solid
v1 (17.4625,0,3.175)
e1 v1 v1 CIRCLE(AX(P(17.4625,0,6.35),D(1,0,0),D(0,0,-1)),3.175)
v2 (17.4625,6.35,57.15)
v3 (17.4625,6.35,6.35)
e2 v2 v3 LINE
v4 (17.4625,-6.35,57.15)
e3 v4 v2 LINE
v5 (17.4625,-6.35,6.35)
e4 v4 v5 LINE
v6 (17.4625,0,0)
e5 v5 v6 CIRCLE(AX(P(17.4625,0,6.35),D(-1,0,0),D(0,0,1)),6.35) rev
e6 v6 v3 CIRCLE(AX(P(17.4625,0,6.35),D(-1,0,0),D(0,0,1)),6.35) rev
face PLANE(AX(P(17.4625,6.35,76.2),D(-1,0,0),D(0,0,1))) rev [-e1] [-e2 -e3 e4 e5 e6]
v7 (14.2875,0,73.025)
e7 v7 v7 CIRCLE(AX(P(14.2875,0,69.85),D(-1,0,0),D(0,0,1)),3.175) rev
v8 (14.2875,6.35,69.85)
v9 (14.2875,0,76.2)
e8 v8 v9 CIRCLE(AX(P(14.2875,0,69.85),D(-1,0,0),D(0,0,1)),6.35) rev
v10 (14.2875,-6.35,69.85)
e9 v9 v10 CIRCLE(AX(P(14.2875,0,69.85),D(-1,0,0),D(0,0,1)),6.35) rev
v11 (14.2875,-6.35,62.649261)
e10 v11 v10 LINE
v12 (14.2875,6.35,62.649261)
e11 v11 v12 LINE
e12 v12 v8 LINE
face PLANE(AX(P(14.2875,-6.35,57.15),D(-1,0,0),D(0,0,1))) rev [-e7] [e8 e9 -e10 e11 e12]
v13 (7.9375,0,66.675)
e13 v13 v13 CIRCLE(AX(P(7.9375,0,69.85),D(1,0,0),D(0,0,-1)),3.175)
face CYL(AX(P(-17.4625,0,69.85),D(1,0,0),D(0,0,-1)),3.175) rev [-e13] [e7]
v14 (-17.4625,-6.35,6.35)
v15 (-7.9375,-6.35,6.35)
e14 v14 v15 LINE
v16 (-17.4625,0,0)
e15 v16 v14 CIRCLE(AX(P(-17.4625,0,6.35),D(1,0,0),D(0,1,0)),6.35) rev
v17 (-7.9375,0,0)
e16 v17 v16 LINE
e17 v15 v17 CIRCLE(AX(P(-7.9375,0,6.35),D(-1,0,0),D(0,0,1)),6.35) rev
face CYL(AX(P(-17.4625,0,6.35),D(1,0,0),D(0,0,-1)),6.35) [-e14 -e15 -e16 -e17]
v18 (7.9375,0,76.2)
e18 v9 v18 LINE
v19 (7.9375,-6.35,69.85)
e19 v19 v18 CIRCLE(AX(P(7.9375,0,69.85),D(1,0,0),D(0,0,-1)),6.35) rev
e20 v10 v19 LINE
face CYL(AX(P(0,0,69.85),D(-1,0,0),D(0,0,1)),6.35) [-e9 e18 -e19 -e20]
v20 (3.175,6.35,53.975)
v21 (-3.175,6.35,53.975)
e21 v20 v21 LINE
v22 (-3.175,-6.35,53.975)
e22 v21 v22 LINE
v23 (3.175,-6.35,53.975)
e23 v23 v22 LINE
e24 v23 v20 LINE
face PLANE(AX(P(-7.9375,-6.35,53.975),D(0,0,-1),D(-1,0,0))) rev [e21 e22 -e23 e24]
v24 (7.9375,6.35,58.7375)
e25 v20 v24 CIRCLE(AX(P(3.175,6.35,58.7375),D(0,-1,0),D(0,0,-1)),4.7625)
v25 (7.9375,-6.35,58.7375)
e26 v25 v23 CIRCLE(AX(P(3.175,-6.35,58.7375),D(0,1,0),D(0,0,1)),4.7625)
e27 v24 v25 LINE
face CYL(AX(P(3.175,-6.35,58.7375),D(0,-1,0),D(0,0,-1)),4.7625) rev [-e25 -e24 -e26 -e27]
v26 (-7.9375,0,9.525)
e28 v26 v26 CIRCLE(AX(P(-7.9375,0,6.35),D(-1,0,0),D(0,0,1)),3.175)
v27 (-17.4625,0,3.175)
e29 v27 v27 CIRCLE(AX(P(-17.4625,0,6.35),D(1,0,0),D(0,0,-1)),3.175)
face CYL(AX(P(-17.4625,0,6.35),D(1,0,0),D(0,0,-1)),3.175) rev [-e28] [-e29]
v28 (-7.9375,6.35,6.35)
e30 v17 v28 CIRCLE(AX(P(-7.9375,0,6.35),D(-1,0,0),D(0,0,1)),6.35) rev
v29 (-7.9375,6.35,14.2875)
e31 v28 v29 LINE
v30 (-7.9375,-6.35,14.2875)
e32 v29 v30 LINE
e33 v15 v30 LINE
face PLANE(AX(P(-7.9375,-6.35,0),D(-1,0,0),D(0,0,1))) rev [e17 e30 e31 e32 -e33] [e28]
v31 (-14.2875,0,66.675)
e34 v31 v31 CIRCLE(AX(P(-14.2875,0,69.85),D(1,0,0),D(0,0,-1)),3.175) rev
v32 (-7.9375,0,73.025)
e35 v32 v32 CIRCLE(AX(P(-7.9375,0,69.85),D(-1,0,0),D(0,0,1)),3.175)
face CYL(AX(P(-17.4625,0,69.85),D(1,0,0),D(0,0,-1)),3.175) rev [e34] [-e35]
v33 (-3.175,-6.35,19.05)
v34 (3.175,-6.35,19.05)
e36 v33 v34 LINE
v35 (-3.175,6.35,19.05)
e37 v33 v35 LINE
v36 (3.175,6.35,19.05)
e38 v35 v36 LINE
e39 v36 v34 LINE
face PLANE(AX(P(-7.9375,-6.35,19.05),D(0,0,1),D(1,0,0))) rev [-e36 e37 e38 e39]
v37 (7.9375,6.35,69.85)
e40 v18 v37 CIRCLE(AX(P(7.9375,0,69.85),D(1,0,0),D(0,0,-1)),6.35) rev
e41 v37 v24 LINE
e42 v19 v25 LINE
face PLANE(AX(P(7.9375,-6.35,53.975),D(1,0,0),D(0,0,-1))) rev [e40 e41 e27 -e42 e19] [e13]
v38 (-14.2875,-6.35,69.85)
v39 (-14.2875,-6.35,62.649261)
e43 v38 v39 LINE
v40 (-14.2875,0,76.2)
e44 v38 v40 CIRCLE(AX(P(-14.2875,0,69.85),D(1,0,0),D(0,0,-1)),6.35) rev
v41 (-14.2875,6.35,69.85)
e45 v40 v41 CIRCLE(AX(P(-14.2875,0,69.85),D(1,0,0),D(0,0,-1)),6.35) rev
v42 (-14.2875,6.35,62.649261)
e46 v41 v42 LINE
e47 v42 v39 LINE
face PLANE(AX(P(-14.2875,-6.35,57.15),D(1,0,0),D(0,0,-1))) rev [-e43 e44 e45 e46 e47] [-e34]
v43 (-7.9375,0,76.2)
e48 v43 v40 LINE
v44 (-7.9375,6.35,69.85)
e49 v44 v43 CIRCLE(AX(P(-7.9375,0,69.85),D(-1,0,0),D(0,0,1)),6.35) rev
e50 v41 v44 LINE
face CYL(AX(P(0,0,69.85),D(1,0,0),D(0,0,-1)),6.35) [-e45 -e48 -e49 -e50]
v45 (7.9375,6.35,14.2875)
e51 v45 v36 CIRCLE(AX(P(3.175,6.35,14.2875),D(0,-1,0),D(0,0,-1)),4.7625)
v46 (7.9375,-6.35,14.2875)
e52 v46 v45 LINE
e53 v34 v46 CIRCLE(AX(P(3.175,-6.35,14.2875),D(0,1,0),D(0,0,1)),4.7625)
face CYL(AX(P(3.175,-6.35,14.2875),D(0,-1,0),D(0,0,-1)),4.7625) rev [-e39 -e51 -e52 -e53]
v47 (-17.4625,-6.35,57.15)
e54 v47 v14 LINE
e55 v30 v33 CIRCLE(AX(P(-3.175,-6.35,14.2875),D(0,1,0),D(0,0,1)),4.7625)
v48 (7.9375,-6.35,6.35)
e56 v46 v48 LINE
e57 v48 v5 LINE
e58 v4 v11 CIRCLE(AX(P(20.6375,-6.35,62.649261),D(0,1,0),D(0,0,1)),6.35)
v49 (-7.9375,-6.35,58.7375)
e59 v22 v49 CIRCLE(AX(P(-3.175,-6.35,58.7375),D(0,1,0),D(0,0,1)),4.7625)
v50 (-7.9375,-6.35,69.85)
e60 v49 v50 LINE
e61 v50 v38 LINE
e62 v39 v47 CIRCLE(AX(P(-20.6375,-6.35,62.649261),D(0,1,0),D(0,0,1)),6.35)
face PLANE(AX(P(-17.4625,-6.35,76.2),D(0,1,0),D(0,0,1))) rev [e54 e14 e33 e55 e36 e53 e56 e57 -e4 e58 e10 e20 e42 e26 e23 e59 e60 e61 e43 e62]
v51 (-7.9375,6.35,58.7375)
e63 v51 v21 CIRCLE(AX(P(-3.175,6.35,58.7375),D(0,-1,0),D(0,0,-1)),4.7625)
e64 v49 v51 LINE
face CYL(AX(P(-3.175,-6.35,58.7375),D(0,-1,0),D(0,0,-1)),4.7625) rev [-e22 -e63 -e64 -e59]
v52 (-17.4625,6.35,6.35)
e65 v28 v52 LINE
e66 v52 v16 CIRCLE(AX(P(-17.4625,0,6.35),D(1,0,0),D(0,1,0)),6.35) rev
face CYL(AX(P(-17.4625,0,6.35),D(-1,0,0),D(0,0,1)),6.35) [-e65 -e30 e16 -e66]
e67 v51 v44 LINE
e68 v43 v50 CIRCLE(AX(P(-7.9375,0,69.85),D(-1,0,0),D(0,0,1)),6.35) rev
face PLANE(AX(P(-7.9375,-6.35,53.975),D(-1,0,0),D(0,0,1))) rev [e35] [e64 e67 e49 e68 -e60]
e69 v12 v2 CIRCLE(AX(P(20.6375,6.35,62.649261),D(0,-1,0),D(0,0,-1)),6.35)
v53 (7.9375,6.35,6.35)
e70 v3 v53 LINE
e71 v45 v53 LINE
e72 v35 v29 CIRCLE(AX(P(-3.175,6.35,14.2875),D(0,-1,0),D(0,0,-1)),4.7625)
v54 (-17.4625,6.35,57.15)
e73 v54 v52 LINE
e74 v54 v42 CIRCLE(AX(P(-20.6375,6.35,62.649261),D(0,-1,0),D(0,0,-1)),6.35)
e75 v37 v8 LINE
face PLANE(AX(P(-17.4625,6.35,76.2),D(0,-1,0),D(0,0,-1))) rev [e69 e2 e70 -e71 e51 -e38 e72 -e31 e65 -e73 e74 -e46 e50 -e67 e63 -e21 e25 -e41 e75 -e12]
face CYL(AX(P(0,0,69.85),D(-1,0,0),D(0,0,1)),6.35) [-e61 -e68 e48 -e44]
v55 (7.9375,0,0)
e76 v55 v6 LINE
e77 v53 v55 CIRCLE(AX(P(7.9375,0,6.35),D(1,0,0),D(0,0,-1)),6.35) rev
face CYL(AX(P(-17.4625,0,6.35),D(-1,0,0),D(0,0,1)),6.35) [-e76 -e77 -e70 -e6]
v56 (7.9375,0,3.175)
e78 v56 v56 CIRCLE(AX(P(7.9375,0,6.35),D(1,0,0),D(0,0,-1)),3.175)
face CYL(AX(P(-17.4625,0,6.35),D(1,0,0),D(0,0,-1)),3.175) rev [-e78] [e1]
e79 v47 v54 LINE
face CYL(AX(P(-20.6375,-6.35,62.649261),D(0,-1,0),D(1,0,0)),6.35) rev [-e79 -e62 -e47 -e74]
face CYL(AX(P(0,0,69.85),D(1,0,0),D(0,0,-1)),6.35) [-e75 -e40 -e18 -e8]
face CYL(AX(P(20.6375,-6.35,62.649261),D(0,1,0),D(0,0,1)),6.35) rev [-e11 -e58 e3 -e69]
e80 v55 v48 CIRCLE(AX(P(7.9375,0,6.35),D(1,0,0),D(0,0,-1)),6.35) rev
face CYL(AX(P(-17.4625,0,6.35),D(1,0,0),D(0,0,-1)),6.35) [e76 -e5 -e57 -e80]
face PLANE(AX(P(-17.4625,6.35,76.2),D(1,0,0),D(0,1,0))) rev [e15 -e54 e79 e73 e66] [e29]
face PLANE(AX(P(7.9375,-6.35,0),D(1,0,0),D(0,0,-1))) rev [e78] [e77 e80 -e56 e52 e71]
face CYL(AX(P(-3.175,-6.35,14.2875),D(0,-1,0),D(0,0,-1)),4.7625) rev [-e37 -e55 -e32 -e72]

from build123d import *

# Parameters (mm, degrees)
SKETCH4_W           = 34.925
SKETCH4_H           = 12.7
BOSS_EXTRUDE2_DEPTH = 76.2
SKETCH6_W           = 15.875
SKETCH6_H           = 22.225
SKETCH6_H_2         = 19.05
CUT_EXTRUDE4_DEPTH  = 80.200182489
FILLET3_R           = 6.35
SKETCH7_R           = 3.175
CUT_EXTRUDE5_DEPTH  = 85.062584572
FILLET4_R           = 4.7625
FILLET5_R           = 4.7625
SKETCH8_W           = 3.175
SKETCH8_H           = 19.05
CUT_EXTRUDE6_DEPTH  = 80.200182489
FILLET6_R           = 6.35


# Some blends are built 0.0001 mm under size
with BuildPart() as part:
    # Sketch4 → Boss-Extrude2 (new body)
    with BuildSketch(Plane.XY):
        Rectangle(SKETCH4_W, SKETCH4_H)
    extrude(amount=BOSS_EXTRUDE2_DEPTH)

    # Sketch6 → Cut-Extrude4 (cut, through all)
    with BuildSketch(Plane(origin=(0, 6.35, 0), x_dir=(1, 0, 0), z_dir=(0, 1, 0))):
        with Locations((0, -65.0875)):
            Rectangle(SKETCH6_W, SKETCH6_H)
        with Locations((0, -9.525)):
            Rectangle(SKETCH6_W, SKETCH6_H_2)
    extrude(amount=-CUT_EXTRUDE4_DEPTH, mode=Mode.SUBTRACT)

    # Fillet3
    fillet3_edges = [part.edges().sort_by_distance(p)[0] for p in [
        (-12.7, -6.35, 0),
        (12.7, -6.35, 0),
        (-12.7, 6.35, 0),
        (12.7, 6.35, 0),
        (12.7, -6.35, 76.2),
        (12.7, 6.35, 76.2),
        (-12.7, -6.35, 76.2),
        (-12.7, 6.35, 76.2),
    ]]
    fillet(fillet3_edges, radius=FILLET3_R - 0.0001)  # a hair under: the kernel refuses the full size

    # Sketch7 → Cut-Extrude5 (cut, through all)
    with BuildSketch(Plane(origin=(17.4625, 0, 0), x_dir=(0, 0, -1), z_dir=(1, 0, 0))):
        with Locations((-6.35, 0)):
            Circle(SKETCH7_R)
        with Locations((-69.85, 0)):
            Circle(SKETCH7_R)
    extrude(amount=-CUT_EXTRUDE5_DEPTH, mode=Mode.SUBTRACT)

    # Fillet4
    fillet4_edges = [part.edges().sort_by_distance(p)[0] for p in [
        (-7.9375, 0, 19.05),
        (7.9375, 0, 19.05),
    ]]
    fillet(fillet4_edges, radius=FILLET4_R)

    # Fillet5
    fillet5_edges = [part.edges().sort_by_distance(p)[0] for p in [
        (-7.9375, 0, 53.975),
        (7.9375, 0, 53.975),
    ]]
    fillet(fillet5_edges, radius=FILLET5_R)

    # Sketch8 → Cut-Extrude6 (cut, through all)
    with BuildSketch(Plane(origin=(0, 6.35, 0), x_dir=(1, 0, 0), z_dir=(0, 1, 0))):
        with Locations((15.875, -66.675)):
            Rectangle(SKETCH8_W, SKETCH8_H)
        with Locations((-15.875, -66.675)):
            Rectangle(SKETCH8_W, SKETCH8_H)
    extrude(amount=-CUT_EXTRUDE6_DEPTH, mode=Mode.SUBTRACT)

    # Fillet6
    # the kernel refuses this fillet: 6.35 mm, written as the material it adds along each edge
    with BuildSketch(Plane(origin=(-14.2875, 6.35, 57.15), x_dir=(0, 0, 1), z_dir=(0, -1, 0))) as fillet6_piece_1:
        with BuildLine():
            CenterArc((5.499261314, 6.35), FILLET6_R, 210, 60)
            Line((0, 3.175), (-0.109985226, 3.1115))
            ThreePointArc((-0.109985226, 3.1115), (-0.127, 1.5875), (-0.127, 0))
            Line((-0.127, 0), (0, -0.127))
            Line((0, -0.127), (5.499261314, -0.127))
            Line((5.499261314, -0.127), (5.499261314, 0))
        make_face()
    extrude(amount=12.7)
    with BuildSketch(Plane(origin=(14.2875, 6.35, 57.15), x_dir=(1, 0, 0), z_dir=(0, -1, 0))) as fillet6_piece_2:
        with BuildLine():
            CenterArc((6.35, 5.499261314), FILLET6_R, 180, 60)
            Line((0, 5.499261314), (-0.127, 5.499261314))
            Line((-0.127, 5.499261314), (-0.127, 0))
            Line((-0.127, 0), (0, -0.127))
            ThreePointArc((0, -0.127), (1.5875, -0.127), (3.1115, -0.109985226))
            Line((3.1115, -0.109985226), (3.175, 0))
        make_face()
    extrude(amount=12.7)


solid = part.part
